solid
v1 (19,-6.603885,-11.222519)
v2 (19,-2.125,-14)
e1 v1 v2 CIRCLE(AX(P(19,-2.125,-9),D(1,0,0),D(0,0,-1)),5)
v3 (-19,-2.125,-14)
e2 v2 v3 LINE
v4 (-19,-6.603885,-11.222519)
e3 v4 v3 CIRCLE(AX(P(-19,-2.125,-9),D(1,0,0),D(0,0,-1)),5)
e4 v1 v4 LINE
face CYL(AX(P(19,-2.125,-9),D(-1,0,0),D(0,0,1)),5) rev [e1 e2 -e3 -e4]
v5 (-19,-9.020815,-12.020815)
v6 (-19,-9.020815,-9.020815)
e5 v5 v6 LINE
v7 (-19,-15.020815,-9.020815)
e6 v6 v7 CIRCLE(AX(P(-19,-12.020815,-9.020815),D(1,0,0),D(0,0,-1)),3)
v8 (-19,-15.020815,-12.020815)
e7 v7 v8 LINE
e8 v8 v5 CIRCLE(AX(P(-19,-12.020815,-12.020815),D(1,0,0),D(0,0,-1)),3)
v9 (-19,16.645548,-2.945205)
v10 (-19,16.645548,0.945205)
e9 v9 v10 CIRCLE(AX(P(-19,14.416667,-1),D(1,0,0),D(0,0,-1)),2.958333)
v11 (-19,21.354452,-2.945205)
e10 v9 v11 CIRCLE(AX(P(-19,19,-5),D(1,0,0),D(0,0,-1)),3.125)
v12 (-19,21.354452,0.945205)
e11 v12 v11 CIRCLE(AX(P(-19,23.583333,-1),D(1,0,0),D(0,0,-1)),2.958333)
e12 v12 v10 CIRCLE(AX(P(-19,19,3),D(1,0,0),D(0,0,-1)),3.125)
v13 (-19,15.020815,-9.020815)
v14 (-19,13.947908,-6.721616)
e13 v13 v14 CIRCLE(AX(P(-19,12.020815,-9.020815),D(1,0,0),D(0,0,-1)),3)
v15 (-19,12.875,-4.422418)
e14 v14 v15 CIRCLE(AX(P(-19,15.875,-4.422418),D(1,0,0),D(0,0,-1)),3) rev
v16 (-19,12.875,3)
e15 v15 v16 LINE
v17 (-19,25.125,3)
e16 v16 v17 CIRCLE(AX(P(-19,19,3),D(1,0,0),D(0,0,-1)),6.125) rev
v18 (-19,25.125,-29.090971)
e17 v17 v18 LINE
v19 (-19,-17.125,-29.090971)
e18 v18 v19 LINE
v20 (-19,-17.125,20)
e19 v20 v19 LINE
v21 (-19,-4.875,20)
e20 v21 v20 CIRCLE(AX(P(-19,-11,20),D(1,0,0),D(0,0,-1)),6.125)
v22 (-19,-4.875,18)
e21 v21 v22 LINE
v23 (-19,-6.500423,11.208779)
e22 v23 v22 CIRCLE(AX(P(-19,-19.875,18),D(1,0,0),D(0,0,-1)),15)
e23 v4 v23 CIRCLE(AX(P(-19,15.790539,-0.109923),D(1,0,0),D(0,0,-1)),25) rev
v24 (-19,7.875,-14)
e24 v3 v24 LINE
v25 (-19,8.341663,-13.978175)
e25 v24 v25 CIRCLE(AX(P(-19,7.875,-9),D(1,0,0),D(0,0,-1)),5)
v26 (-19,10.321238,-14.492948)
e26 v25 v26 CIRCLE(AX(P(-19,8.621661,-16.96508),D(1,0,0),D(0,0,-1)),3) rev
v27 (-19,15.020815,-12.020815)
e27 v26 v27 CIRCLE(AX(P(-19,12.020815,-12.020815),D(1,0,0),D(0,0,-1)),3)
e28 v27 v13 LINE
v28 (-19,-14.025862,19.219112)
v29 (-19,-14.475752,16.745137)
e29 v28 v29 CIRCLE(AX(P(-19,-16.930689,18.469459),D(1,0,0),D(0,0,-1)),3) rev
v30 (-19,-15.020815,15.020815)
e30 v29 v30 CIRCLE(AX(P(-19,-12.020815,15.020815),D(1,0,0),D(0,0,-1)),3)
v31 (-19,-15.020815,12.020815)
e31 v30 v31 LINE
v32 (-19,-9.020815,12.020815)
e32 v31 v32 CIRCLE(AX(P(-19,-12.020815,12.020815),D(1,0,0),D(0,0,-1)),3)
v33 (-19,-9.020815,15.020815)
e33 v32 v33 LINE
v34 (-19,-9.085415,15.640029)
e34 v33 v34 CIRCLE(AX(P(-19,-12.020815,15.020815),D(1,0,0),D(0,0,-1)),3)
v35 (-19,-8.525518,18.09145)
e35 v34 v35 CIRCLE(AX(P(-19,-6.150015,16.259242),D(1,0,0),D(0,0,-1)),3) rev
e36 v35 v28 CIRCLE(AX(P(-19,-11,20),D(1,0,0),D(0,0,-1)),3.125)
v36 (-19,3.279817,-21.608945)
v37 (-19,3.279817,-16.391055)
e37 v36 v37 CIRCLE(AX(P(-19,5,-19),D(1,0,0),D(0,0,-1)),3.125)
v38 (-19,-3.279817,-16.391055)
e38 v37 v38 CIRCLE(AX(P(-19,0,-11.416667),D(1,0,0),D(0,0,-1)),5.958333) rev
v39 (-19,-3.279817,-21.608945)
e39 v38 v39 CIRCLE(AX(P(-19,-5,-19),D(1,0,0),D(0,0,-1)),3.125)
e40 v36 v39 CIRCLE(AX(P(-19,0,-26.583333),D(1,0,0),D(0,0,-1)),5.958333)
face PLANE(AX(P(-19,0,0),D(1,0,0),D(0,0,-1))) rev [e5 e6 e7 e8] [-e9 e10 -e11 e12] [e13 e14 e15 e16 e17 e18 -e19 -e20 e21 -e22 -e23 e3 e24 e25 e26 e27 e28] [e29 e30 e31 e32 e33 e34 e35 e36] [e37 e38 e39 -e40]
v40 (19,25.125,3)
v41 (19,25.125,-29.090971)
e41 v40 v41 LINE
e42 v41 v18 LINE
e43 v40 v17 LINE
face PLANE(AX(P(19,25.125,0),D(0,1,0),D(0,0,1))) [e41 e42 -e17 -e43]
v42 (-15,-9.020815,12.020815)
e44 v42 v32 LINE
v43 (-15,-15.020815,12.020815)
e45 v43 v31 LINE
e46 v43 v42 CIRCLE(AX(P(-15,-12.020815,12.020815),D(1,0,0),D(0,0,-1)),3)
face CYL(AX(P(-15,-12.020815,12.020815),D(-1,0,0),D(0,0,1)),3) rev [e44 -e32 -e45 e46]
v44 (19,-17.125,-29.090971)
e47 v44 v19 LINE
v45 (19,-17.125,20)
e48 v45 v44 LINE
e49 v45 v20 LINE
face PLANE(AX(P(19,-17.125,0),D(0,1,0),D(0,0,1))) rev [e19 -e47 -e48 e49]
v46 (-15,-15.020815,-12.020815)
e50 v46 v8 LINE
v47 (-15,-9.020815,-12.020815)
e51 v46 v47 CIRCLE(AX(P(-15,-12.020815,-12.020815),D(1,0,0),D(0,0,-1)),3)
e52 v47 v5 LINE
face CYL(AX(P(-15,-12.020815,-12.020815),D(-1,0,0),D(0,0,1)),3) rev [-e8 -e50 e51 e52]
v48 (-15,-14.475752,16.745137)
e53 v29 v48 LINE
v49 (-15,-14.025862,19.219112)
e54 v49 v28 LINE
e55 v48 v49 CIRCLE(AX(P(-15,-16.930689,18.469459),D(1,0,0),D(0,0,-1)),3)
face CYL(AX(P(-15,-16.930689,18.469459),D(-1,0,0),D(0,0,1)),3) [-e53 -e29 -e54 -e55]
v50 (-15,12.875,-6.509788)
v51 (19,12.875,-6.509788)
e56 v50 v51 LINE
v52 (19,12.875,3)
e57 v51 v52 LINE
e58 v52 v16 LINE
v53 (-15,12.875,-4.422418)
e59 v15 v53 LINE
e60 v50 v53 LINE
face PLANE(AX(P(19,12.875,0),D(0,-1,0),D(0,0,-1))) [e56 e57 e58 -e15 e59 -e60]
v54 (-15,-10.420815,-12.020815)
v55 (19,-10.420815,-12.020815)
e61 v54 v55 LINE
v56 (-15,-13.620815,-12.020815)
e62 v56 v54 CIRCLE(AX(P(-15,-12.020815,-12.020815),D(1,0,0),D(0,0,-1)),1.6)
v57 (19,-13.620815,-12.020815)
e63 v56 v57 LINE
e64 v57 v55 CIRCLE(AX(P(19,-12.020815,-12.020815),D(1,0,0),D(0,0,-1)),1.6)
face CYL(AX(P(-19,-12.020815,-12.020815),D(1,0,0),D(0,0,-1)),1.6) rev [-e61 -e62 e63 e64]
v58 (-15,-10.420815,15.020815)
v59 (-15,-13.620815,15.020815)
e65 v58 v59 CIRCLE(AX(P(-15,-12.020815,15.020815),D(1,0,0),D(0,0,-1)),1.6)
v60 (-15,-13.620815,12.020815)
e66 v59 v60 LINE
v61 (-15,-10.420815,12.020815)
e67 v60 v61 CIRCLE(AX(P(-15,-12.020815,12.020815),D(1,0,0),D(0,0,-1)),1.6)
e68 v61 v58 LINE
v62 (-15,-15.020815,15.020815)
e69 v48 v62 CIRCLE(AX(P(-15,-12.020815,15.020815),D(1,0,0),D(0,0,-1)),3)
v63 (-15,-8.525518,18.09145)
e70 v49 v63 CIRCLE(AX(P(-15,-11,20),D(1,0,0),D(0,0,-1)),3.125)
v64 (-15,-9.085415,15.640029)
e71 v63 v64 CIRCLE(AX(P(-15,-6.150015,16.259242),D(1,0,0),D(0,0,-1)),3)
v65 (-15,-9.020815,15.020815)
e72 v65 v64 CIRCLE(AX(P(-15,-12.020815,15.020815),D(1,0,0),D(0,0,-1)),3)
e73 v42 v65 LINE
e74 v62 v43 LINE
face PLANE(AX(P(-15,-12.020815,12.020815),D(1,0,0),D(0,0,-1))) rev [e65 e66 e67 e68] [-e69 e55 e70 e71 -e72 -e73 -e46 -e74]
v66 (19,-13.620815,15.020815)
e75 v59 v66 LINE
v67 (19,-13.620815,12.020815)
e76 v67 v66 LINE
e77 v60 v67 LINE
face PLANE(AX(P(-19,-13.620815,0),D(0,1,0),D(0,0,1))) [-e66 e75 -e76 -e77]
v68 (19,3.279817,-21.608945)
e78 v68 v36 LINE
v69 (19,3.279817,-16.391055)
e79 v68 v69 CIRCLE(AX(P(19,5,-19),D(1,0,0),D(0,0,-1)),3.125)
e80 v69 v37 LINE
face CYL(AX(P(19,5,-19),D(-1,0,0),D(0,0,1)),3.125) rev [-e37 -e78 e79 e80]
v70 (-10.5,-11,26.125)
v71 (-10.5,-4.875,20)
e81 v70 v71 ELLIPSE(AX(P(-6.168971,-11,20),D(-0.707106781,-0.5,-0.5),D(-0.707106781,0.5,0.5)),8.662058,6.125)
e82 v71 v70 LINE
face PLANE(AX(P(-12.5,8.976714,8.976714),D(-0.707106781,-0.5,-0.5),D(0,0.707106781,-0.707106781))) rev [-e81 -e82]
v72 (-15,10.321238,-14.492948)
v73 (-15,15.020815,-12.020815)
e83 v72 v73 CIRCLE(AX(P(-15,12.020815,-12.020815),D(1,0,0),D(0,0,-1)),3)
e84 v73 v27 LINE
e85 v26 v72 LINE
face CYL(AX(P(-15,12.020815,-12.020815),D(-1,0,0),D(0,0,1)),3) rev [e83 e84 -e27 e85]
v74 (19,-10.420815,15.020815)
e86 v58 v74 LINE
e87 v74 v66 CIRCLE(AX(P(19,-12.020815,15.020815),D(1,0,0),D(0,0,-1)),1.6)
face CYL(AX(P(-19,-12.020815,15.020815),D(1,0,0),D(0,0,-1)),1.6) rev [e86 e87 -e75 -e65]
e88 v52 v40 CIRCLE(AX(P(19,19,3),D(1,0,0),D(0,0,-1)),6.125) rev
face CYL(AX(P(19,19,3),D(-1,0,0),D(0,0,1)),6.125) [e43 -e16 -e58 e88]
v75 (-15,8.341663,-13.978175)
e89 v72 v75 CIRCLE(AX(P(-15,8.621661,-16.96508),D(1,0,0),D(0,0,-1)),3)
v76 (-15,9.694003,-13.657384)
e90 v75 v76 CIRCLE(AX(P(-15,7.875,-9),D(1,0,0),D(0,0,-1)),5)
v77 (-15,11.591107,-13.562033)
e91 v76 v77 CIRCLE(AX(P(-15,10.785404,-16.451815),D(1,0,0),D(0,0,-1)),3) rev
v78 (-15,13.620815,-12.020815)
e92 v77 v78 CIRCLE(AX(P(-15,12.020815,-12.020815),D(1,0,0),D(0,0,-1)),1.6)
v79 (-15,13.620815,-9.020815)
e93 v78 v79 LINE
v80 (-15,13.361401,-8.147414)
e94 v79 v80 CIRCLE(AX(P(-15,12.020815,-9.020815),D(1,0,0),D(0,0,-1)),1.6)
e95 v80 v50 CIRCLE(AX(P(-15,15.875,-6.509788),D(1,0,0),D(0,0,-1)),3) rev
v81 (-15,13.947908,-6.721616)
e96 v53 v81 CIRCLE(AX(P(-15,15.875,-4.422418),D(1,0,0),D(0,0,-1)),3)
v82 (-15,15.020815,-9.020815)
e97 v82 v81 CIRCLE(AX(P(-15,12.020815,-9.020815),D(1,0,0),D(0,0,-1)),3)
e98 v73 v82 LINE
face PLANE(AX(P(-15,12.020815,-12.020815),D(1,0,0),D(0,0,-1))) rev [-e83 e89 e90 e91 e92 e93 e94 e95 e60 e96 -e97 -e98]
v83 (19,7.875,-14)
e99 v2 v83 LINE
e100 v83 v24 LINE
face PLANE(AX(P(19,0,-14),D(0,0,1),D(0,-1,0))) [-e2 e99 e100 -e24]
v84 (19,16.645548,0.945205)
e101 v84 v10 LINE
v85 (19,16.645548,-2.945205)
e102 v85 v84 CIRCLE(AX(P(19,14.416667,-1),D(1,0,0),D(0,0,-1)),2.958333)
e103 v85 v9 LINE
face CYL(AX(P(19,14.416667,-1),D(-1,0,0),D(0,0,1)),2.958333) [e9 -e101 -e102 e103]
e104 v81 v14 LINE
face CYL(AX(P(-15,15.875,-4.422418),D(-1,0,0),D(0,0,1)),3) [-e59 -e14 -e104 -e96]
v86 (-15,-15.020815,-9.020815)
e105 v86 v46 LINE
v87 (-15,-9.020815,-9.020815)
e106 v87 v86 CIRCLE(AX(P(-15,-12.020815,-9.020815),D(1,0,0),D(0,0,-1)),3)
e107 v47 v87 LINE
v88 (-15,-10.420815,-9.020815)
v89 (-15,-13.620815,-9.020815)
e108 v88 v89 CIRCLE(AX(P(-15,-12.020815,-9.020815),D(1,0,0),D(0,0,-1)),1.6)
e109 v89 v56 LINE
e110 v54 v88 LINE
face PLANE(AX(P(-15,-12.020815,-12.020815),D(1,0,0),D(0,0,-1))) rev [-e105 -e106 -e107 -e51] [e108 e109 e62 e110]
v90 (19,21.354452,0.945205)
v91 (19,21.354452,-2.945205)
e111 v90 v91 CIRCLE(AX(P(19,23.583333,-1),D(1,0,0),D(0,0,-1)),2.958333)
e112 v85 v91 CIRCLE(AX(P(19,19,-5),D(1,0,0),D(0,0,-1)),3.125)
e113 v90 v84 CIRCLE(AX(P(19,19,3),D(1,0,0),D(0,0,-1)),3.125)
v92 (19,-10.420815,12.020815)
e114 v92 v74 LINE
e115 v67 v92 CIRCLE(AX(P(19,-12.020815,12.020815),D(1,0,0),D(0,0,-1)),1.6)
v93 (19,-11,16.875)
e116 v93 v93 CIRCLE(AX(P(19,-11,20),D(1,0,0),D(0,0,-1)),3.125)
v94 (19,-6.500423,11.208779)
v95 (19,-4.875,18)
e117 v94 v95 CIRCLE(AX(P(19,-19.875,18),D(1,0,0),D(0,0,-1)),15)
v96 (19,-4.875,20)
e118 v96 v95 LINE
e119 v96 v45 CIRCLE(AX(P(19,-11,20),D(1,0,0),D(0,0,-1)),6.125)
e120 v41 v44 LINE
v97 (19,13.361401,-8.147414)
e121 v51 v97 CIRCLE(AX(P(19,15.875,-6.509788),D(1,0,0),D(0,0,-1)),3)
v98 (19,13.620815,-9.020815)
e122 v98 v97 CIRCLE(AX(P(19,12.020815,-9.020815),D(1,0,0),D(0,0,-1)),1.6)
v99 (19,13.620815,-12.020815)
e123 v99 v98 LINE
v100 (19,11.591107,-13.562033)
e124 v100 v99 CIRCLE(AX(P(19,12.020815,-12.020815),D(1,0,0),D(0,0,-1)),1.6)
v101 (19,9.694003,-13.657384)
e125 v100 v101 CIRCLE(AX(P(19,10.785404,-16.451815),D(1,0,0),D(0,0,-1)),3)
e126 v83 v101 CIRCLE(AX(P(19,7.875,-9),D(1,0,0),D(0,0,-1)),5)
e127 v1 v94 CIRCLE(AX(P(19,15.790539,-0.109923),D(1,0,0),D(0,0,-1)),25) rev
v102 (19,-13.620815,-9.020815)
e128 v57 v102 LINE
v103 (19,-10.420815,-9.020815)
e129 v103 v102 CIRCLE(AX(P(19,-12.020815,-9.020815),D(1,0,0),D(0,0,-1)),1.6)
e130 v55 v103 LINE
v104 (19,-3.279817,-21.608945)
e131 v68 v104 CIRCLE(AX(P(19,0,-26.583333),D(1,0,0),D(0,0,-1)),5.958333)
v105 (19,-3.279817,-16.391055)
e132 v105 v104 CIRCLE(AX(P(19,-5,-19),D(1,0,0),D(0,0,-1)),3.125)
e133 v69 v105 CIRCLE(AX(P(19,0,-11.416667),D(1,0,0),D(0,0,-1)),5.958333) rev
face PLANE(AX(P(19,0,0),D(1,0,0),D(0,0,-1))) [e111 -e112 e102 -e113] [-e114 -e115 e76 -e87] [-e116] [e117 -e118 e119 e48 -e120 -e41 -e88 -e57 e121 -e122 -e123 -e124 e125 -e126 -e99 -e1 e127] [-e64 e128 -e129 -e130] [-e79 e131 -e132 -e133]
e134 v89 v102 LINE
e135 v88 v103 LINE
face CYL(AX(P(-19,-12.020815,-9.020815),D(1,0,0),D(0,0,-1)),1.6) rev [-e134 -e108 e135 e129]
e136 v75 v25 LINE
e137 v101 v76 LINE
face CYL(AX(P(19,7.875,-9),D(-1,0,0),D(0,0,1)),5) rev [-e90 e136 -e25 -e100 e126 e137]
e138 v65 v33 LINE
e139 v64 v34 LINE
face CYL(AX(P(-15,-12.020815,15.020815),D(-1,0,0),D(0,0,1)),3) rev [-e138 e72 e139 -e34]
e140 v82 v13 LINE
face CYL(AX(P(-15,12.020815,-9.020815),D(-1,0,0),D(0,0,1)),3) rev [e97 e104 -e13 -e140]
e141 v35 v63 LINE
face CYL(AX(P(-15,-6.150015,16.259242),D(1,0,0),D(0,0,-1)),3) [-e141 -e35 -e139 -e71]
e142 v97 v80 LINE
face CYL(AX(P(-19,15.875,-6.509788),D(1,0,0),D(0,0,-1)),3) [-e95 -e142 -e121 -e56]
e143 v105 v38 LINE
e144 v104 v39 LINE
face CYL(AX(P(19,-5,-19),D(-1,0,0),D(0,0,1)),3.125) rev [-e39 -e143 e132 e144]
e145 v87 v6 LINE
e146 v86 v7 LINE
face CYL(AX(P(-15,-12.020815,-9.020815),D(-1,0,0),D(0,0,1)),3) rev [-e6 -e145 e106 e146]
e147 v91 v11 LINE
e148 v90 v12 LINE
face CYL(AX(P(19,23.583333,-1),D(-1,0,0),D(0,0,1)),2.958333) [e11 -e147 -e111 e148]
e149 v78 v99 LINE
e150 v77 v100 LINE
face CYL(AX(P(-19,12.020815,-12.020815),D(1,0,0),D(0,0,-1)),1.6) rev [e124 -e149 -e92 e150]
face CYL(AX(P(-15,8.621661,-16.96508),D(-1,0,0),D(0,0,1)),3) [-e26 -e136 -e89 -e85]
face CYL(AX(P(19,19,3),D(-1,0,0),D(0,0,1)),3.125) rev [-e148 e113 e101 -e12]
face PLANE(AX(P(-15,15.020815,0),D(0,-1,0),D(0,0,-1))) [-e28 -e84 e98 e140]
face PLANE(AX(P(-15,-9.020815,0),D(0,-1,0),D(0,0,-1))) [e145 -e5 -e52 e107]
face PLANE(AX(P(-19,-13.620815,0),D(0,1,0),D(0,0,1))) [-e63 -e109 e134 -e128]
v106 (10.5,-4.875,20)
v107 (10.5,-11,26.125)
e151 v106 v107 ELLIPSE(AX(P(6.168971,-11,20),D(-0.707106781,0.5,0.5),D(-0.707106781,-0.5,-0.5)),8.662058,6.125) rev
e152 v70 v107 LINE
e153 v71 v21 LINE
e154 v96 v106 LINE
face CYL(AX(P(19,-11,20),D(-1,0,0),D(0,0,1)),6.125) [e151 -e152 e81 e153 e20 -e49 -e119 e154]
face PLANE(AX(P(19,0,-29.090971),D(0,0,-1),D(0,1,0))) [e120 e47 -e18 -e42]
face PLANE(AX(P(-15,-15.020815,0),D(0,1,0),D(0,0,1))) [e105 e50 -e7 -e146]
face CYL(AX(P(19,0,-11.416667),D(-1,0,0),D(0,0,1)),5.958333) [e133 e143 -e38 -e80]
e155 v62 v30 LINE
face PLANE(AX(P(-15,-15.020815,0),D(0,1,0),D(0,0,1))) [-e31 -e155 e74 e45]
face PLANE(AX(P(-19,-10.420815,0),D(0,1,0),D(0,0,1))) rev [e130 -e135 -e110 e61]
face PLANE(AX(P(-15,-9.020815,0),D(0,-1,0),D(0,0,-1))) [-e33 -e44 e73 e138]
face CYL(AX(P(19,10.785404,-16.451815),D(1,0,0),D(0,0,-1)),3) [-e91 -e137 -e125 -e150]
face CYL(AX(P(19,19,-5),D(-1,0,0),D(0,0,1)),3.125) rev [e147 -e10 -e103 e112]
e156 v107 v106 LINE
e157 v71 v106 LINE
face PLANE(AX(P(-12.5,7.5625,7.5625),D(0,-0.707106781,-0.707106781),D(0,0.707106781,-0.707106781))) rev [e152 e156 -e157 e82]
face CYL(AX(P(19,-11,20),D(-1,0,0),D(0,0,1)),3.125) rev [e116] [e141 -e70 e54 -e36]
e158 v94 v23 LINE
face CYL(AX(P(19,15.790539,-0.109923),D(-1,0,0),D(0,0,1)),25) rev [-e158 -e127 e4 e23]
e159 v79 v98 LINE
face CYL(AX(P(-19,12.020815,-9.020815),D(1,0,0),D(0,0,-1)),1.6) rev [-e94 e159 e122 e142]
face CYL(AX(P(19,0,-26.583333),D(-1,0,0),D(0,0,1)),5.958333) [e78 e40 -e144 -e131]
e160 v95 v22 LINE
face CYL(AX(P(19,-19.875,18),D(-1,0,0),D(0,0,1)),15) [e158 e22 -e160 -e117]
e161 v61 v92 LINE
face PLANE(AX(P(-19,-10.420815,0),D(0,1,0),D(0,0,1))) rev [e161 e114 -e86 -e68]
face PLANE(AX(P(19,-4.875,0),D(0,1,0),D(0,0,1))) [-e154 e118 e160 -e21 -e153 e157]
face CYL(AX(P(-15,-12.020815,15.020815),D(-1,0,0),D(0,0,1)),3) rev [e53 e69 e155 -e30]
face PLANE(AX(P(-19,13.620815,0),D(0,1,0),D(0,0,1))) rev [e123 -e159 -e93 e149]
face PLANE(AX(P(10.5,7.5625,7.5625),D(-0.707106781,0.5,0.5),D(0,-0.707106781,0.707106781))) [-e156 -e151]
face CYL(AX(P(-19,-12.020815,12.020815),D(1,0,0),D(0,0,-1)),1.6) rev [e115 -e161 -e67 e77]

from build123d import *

# Parameters (mm, degrees)
SKETCH1_R               = 3.125
BOSS_EXTRUDE1_DEPTH     = 19
CUT_EXTRUDE1_DEPTH      = 43.878318603
CUT_EXTRUDE1_DEPTH_BACK = 43.878318603
CUT_EXTRUDE2_START      = -19
CUT_EXTRUDE2_DEPTH      = 4
FILLET2_R               = 3
CUT_EXTRUDE6_DEPTH      = 12.5
CHAMFER1_SIZE           = 2


with BuildPart() as part:
    # Sketch1 → Boss-Extrude1 (new, symmetric)
    # profile 1 of 2: a face of its own
    with BuildSketch(Plane(origin=(0, 0, 0), x_dir=(0, 0, -1), z_dir=(1, 0, 0))):
        with BuildLine():
            ThreePointArc((-26.125, -11), (-24.331029035, -15.331029035), (-20, -17.125))
            Line((-20, -17.125), (29.090970785, -17.125))
            Line((29.090970785, -17.125), (29.090970785, 25.125))
            Line((29.090970785, 25.125), (-3, 25.125))
            ThreePointArc((-3, 25.125), (-9.125, 19), (-3, 12.875))
            Line((-3, 12.875), (9, 12.875))
            ThreePointArc((9, 12.875), (12.535533906, 11.410533906), (14, 7.875))
            Line((14, 7.875), (14, -2.125))
            ThreePointArc((14, -2.125), (13.249270274, -4.760090537), (11.222519145, -6.603884755))
            ThreePointArc((11.222519145, -6.603884755), (-0.005385096, -9.209195056), (-11.208778717, -6.500422867))
            ThreePointArc((-11.208778717, -6.500422867), (-14.508485787, -5.287014241), (-18, -4.875))
            Line((-18, -4.875), (-20, -4.875))
            Line((-20, -4.875), (-26.125, -11))
        make_face()
        with Locations((-20, -11)):
            Circle(SKETCH1_R, mode=Mode.SUBTRACT)
        with BuildLine():
            ThreePointArc((16.391055046, 3.279816514), (18.102037858, 7.993207141), (22.125, 5))
            ThreePointArc((22.125, 5), (21.993207141, 4.102037858), (21.608944954, 3.279816514))
            ThreePointArc((21.608944954, 3.279816514), (20.625, 0), (21.608944954, -3.279816514))
            ThreePointArc((21.608944954, -3.279816514), (21.993207141, -4.102037858), (22.125, -5))
            ThreePointArc((22.125, -5), (18.102037858, -7.993207141), (16.391055046, -3.279816514))
            ThreePointArc((16.391055046, -3.279816514), (17.375, 0), (16.391055046, 3.279816514))
        make_face(mode=Mode.SUBTRACT)
        with BuildLine():
            ThreePointArc((-0.945205479, 16.645547945), (-6.125, 19), (-0.945205479, 21.354452055))
            ThreePointArc((-0.945205479, 21.354452055), (1, 20.625), (2.945205479, 21.354452055))
            ThreePointArc((2.945205479, 21.354452055), (6.293134201, 21.844895242), (8.125, 19))
            ThreePointArc((8.125, 19), (6.293134201, 16.155104758), (2.945205479, 16.645547945))
            ThreePointArc((2.945205479, 16.645547945), (1, 17.375), (-0.945205479, 16.645547945))
        make_face(mode=Mode.SUBTRACT)
    # profile 2 of 2: a face of its own
    with BuildSketch(Plane(origin=(0, 0, 0), x_dir=(0, 0, -1), z_dir=(1, 0, 0))):
        with BuildLine():
            ThreePointArc((-20, -4.875), (-24.331029035, -6.668970965), (-26.125, -11))
            Line((-26.125, -11), (-20, -4.875))
        make_face()
    extrude(amount=BOSS_EXTRUDE1_DEPTH, both=True)

    # Sketch2 → Cut-Extrude1 (cut, two sides: drawn at the far end of the back side and taken through both)
    with BuildSketch(Plane(origin=(0, 0, 0), x_dir=(0, 0, -1), z_dir=(1, 0, 0)).offset(-CUT_EXTRUDE1_DEPTH_BACK)):
        with BuildLine():
            Line((-12.02081528, 13.62081528), (-15.02081528, 13.62081528))
            ThreePointArc((-15.02081528, 13.62081528), (-16.62081528, 12.02081528), (-15.02081528, 10.42081528))
            Line((-15.02081528, 10.42081528), (-12.02081528, 10.42081528))
            ThreePointArc((-12.02081528, 10.42081528), (-10.42081528, 12.02081528), (-12.02081528, 13.62081528))
        make_face()
        with BuildLine():
            Line((12.02081528, 13.62081528), (9.02081528, 13.62081528))
            ThreePointArc((9.02081528, 13.62081528), (7.42081528, 12.02081528), (9.02081528, 10.42081528))
            Line((9.02081528, 10.42081528), (12.02081528, 10.42081528))
            ThreePointArc((12.02081528, 10.42081528), (13.62081528, 12.02081528), (12.02081528, 13.62081528))
        make_face()
        with BuildLine():
            Line((12.02081528, -10.42081528), (9.02081528, -10.42081528))
            ThreePointArc((9.02081528, -10.42081528), (7.42081528, -12.02081528), (9.02081528, -13.62081528))
            Line((9.02081528, -13.62081528), (12.02081528, -13.62081528))
            ThreePointArc((12.02081528, -13.62081528), (13.62081528, -12.02081528), (12.02081528, -10.42081528))
        make_face()
        with BuildLine():
            Line((-12.02081528, -10.42081528), (-15.02081528, -10.42081528))
            ThreePointArc((-15.02081528, -10.42081528), (-16.62081528, -12.02081528), (-15.02081528, -13.62081528))
            Line((-15.02081528, -13.62081528), (-12.02081528, -13.62081528))
            ThreePointArc((-12.02081528, -13.62081528), (-10.42081528, -12.02081528), (-12.02081528, -10.42081528))
        make_face()
    extrude(amount=CUT_EXTRUDE1_DEPTH + CUT_EXTRUDE1_DEPTH_BACK, mode=Mode.SUBTRACT)

    # Sketch2<3> → Cut-Extrude2 (cut)
    # profile 1 of 4: a face of its own
    with BuildSketch(Plane(origin=(0, 0, 0), x_dir=(0, 0, -1), z_dir=(1, 0, 0)).offset(CUT_EXTRUDE2_START)):
        with BuildLine():
            Line((-12.02081528, 9.02081528), (-15.02081528, 9.02081528))
            ThreePointArc((-15.02081528, 9.02081528), (-18.02081528, 12.02081528), (-15.02081528, 15.02081528))
            Line((-15.02081528, 15.02081528), (-12.02081528, 15.02081528))
            ThreePointArc((-12.02081528, 15.02081528), (-9.02081528, 12.02081528), (-12.02081528, 9.02081528))
        make_face()
        with BuildLine():
            Line((-12.02081528, 10.42081528), (-15.02081528, 10.42081528))
            ThreePointArc((-15.02081528, 10.42081528), (-16.62081528, 12.02081528), (-15.02081528, 13.62081528))
            Line((-15.02081528, 13.62081528), (-12.02081528, 13.62081528))
            ThreePointArc((-12.02081528, 13.62081528), (-10.42081528, 12.02081528), (-12.02081528, 10.42081528))
        make_face(mode=Mode.SUBTRACT)
    # profile 2 of 4: a face of its own
    with BuildSketch(Plane(origin=(0, 0, 0), x_dir=(0, 0, -1), z_dir=(1, 0, 0)).offset(CUT_EXTRUDE2_START)):
        with BuildLine():
            Line((-12.02081528, -15.02081528), (-15.02081528, -15.02081528))
            ThreePointArc((-15.02081528, -15.02081528), (-18.02081528, -12.02081528), (-15.02081528, -9.02081528))
            Line((-15.02081528, -9.02081528), (-12.02081528, -9.02081528))
            ThreePointArc((-12.02081528, -9.02081528), (-9.02081528, -12.02081528), (-12.02081528, -15.02081528))
        make_face()
        with BuildLine():
            Line((-12.02081528, -13.62081528), (-15.02081528, -13.62081528))
            ThreePointArc((-15.02081528, -13.62081528), (-16.62081528, -12.02081528), (-15.02081528, -10.42081528))
            Line((-15.02081528, -10.42081528), (-12.02081528, -10.42081528))
            ThreePointArc((-12.02081528, -10.42081528), (-10.42081528, -12.02081528), (-12.02081528, -13.62081528))
        make_face(mode=Mode.SUBTRACT)
    # profile 3 of 4: a face of its own
    with BuildSketch(Plane(origin=(0, 0, 0), x_dir=(0, 0, -1), z_dir=(1, 0, 0)).offset(CUT_EXTRUDE2_START)):
        with BuildLine():
            Line((12.02081528, -15.02081528), (9.02081528, -15.02081528))
            ThreePointArc((9.02081528, -15.02081528), (6.02081528, -12.02081528), (9.02081528, -9.02081528))
            Line((9.02081528, -9.02081528), (12.02081528, -9.02081528))
            ThreePointArc((12.02081528, -9.02081528), (15.02081528, -12.02081528), (12.02081528, -15.02081528))
        make_face()
        with BuildLine():
            Line((12.02081528, -13.62081528), (9.02081528, -13.62081528))
            ThreePointArc((9.02081528, -13.62081528), (7.42081528, -12.02081528), (9.02081528, -10.42081528))
            Line((9.02081528, -10.42081528), (12.02081528, -10.42081528))
            ThreePointArc((12.02081528, -10.42081528), (13.62081528, -12.02081528), (12.02081528, -13.62081528))
        make_face(mode=Mode.SUBTRACT)
    # profile 4 of 4: a face of its own
    with BuildSketch(Plane(origin=(0, 0, 0), x_dir=(0, 0, -1), z_dir=(1, 0, 0)).offset(CUT_EXTRUDE2_START)):
        with BuildLine():
            Line((12.02081528, 9.02081528), (9.02081528, 9.02081528))
            ThreePointArc((9.02081528, 9.02081528), (6.02081528, 12.02081528), (9.02081528, 15.02081528))
            Line((9.02081528, 15.02081528), (12.02081528, 15.02081528))
            ThreePointArc((12.02081528, 15.02081528), (15.02081528, 12.02081528), (12.02081528, 9.02081528))
        make_face()
        with BuildLine():
            Line((12.02081528, 10.42081528), (9.02081528, 10.42081528))
            ThreePointArc((9.02081528, 10.42081528), (7.42081528, 12.02081528), (9.02081528, 13.62081528))
            Line((9.02081528, 13.62081528), (12.02081528, 13.62081528))
            ThreePointArc((12.02081528, 13.62081528), (13.62081528, 12.02081528), (12.02081528, 10.42081528))
        make_face(mode=Mode.SUBTRACT)
    extrude(amount=CUT_EXTRUDE2_DEPTH, mode=Mode.SUBTRACT)

    # Fillet2
    fillet2_edges = [part.edges().sort_by_distance(p)[0] for p in [
        (2, 10.800069224, -13.055116526),
        (-17, 9.543812481, -13.713285998),
        (-17, 12.875, -6.144990448),
        (-17, -13.199102102, 17.779735389),
        (-17, -9.851965995, 17.093517087),
        (2, 12.875, -7.667904173),
    ]]
    fillet(fillet2_edges, radius=FILLET2_R)

    # Sketch1<4> → Cut-Extrude6 (cut, symmetric)
    with BuildSketch(Plane(origin=(0, 0, 0), x_dir=(0, 0, -1), z_dir=(1, 0, 0))):
        with BuildLine():
            ThreePointArc((-20, -4.875), (-24.331029035, -6.668970965), (-26.125, -11))
            Line((-26.125, -11), (-20, -4.875))
        make_face()
    extrude(amount=CUT_EXTRUDE6_DEPTH, both=True, mode=Mode.SUBTRACT)

    # Chamfer1
    # the kernel refuses this chamfer: 2 mm, written as the material it adds along each edge
    with BuildSketch(Plane(origin=(12.5, -14.63690896, 29.76190896), x_dir=(-0.9996219169112968, -0.01944252080601336, -0.019442520806013355), z_dir=(0, 0.7071067811865475, -0.7071067811865476))) as chamfer1_piece_1_section:
        Polygon((CHAMFER1_SIZE * 0.999621916911, CHAMFER1_SIZE * 0.0274958766106), (-CHAMFER1_SIZE * 0.0274958766106, CHAMFER1_SIZE * 0.999621916911), (0, 0), align=None)
    chamfer1_piece_1 = extrude(amount=18.948790021, mode=Mode.PRIVATE)
    chamfer1_piece_1 = chamfer1_piece_1 & Plane(origin=(11.776447372, -11, 20), x_dir=(0, 0, 1), z_dir=(1, 0, 0)) * Cylinder(6.125, 46, mode=Mode.PRIVATE)
    add(chamfer1_piece_1)
    with BuildSketch(Plane(origin=(-12.5, -14.63690896, 29.76190896), x_dir=(0.9996219169112968, -0.01944252080601336, -0.019442520806013355), z_dir=(0, 0.7071067811865475, -0.7071067811865476))) as chamfer1_piece_2_section:
        Polygon((CHAMFER1_SIZE * 0.999621916911, -CHAMFER1_SIZE * 0.0274958766106), (-CHAMFER1_SIZE * 0.0274958766106, -CHAMFER1_SIZE * 0.999621916911), (0, 0), align=None)
    chamfer1_piece_2 = extrude(amount=18.948790021, mode=Mode.PRIVATE)
    chamfer1_piece_2 = chamfer1_piece_2 & Plane(origin=(-11.776447372, -11, 20), x_dir=(0, 0, 1), z_dir=(1, 0, 0)) * Cylinder(6.125, 46, mode=Mode.PRIVATE)
    add(chamfer1_piece_2)


solid = part.part
